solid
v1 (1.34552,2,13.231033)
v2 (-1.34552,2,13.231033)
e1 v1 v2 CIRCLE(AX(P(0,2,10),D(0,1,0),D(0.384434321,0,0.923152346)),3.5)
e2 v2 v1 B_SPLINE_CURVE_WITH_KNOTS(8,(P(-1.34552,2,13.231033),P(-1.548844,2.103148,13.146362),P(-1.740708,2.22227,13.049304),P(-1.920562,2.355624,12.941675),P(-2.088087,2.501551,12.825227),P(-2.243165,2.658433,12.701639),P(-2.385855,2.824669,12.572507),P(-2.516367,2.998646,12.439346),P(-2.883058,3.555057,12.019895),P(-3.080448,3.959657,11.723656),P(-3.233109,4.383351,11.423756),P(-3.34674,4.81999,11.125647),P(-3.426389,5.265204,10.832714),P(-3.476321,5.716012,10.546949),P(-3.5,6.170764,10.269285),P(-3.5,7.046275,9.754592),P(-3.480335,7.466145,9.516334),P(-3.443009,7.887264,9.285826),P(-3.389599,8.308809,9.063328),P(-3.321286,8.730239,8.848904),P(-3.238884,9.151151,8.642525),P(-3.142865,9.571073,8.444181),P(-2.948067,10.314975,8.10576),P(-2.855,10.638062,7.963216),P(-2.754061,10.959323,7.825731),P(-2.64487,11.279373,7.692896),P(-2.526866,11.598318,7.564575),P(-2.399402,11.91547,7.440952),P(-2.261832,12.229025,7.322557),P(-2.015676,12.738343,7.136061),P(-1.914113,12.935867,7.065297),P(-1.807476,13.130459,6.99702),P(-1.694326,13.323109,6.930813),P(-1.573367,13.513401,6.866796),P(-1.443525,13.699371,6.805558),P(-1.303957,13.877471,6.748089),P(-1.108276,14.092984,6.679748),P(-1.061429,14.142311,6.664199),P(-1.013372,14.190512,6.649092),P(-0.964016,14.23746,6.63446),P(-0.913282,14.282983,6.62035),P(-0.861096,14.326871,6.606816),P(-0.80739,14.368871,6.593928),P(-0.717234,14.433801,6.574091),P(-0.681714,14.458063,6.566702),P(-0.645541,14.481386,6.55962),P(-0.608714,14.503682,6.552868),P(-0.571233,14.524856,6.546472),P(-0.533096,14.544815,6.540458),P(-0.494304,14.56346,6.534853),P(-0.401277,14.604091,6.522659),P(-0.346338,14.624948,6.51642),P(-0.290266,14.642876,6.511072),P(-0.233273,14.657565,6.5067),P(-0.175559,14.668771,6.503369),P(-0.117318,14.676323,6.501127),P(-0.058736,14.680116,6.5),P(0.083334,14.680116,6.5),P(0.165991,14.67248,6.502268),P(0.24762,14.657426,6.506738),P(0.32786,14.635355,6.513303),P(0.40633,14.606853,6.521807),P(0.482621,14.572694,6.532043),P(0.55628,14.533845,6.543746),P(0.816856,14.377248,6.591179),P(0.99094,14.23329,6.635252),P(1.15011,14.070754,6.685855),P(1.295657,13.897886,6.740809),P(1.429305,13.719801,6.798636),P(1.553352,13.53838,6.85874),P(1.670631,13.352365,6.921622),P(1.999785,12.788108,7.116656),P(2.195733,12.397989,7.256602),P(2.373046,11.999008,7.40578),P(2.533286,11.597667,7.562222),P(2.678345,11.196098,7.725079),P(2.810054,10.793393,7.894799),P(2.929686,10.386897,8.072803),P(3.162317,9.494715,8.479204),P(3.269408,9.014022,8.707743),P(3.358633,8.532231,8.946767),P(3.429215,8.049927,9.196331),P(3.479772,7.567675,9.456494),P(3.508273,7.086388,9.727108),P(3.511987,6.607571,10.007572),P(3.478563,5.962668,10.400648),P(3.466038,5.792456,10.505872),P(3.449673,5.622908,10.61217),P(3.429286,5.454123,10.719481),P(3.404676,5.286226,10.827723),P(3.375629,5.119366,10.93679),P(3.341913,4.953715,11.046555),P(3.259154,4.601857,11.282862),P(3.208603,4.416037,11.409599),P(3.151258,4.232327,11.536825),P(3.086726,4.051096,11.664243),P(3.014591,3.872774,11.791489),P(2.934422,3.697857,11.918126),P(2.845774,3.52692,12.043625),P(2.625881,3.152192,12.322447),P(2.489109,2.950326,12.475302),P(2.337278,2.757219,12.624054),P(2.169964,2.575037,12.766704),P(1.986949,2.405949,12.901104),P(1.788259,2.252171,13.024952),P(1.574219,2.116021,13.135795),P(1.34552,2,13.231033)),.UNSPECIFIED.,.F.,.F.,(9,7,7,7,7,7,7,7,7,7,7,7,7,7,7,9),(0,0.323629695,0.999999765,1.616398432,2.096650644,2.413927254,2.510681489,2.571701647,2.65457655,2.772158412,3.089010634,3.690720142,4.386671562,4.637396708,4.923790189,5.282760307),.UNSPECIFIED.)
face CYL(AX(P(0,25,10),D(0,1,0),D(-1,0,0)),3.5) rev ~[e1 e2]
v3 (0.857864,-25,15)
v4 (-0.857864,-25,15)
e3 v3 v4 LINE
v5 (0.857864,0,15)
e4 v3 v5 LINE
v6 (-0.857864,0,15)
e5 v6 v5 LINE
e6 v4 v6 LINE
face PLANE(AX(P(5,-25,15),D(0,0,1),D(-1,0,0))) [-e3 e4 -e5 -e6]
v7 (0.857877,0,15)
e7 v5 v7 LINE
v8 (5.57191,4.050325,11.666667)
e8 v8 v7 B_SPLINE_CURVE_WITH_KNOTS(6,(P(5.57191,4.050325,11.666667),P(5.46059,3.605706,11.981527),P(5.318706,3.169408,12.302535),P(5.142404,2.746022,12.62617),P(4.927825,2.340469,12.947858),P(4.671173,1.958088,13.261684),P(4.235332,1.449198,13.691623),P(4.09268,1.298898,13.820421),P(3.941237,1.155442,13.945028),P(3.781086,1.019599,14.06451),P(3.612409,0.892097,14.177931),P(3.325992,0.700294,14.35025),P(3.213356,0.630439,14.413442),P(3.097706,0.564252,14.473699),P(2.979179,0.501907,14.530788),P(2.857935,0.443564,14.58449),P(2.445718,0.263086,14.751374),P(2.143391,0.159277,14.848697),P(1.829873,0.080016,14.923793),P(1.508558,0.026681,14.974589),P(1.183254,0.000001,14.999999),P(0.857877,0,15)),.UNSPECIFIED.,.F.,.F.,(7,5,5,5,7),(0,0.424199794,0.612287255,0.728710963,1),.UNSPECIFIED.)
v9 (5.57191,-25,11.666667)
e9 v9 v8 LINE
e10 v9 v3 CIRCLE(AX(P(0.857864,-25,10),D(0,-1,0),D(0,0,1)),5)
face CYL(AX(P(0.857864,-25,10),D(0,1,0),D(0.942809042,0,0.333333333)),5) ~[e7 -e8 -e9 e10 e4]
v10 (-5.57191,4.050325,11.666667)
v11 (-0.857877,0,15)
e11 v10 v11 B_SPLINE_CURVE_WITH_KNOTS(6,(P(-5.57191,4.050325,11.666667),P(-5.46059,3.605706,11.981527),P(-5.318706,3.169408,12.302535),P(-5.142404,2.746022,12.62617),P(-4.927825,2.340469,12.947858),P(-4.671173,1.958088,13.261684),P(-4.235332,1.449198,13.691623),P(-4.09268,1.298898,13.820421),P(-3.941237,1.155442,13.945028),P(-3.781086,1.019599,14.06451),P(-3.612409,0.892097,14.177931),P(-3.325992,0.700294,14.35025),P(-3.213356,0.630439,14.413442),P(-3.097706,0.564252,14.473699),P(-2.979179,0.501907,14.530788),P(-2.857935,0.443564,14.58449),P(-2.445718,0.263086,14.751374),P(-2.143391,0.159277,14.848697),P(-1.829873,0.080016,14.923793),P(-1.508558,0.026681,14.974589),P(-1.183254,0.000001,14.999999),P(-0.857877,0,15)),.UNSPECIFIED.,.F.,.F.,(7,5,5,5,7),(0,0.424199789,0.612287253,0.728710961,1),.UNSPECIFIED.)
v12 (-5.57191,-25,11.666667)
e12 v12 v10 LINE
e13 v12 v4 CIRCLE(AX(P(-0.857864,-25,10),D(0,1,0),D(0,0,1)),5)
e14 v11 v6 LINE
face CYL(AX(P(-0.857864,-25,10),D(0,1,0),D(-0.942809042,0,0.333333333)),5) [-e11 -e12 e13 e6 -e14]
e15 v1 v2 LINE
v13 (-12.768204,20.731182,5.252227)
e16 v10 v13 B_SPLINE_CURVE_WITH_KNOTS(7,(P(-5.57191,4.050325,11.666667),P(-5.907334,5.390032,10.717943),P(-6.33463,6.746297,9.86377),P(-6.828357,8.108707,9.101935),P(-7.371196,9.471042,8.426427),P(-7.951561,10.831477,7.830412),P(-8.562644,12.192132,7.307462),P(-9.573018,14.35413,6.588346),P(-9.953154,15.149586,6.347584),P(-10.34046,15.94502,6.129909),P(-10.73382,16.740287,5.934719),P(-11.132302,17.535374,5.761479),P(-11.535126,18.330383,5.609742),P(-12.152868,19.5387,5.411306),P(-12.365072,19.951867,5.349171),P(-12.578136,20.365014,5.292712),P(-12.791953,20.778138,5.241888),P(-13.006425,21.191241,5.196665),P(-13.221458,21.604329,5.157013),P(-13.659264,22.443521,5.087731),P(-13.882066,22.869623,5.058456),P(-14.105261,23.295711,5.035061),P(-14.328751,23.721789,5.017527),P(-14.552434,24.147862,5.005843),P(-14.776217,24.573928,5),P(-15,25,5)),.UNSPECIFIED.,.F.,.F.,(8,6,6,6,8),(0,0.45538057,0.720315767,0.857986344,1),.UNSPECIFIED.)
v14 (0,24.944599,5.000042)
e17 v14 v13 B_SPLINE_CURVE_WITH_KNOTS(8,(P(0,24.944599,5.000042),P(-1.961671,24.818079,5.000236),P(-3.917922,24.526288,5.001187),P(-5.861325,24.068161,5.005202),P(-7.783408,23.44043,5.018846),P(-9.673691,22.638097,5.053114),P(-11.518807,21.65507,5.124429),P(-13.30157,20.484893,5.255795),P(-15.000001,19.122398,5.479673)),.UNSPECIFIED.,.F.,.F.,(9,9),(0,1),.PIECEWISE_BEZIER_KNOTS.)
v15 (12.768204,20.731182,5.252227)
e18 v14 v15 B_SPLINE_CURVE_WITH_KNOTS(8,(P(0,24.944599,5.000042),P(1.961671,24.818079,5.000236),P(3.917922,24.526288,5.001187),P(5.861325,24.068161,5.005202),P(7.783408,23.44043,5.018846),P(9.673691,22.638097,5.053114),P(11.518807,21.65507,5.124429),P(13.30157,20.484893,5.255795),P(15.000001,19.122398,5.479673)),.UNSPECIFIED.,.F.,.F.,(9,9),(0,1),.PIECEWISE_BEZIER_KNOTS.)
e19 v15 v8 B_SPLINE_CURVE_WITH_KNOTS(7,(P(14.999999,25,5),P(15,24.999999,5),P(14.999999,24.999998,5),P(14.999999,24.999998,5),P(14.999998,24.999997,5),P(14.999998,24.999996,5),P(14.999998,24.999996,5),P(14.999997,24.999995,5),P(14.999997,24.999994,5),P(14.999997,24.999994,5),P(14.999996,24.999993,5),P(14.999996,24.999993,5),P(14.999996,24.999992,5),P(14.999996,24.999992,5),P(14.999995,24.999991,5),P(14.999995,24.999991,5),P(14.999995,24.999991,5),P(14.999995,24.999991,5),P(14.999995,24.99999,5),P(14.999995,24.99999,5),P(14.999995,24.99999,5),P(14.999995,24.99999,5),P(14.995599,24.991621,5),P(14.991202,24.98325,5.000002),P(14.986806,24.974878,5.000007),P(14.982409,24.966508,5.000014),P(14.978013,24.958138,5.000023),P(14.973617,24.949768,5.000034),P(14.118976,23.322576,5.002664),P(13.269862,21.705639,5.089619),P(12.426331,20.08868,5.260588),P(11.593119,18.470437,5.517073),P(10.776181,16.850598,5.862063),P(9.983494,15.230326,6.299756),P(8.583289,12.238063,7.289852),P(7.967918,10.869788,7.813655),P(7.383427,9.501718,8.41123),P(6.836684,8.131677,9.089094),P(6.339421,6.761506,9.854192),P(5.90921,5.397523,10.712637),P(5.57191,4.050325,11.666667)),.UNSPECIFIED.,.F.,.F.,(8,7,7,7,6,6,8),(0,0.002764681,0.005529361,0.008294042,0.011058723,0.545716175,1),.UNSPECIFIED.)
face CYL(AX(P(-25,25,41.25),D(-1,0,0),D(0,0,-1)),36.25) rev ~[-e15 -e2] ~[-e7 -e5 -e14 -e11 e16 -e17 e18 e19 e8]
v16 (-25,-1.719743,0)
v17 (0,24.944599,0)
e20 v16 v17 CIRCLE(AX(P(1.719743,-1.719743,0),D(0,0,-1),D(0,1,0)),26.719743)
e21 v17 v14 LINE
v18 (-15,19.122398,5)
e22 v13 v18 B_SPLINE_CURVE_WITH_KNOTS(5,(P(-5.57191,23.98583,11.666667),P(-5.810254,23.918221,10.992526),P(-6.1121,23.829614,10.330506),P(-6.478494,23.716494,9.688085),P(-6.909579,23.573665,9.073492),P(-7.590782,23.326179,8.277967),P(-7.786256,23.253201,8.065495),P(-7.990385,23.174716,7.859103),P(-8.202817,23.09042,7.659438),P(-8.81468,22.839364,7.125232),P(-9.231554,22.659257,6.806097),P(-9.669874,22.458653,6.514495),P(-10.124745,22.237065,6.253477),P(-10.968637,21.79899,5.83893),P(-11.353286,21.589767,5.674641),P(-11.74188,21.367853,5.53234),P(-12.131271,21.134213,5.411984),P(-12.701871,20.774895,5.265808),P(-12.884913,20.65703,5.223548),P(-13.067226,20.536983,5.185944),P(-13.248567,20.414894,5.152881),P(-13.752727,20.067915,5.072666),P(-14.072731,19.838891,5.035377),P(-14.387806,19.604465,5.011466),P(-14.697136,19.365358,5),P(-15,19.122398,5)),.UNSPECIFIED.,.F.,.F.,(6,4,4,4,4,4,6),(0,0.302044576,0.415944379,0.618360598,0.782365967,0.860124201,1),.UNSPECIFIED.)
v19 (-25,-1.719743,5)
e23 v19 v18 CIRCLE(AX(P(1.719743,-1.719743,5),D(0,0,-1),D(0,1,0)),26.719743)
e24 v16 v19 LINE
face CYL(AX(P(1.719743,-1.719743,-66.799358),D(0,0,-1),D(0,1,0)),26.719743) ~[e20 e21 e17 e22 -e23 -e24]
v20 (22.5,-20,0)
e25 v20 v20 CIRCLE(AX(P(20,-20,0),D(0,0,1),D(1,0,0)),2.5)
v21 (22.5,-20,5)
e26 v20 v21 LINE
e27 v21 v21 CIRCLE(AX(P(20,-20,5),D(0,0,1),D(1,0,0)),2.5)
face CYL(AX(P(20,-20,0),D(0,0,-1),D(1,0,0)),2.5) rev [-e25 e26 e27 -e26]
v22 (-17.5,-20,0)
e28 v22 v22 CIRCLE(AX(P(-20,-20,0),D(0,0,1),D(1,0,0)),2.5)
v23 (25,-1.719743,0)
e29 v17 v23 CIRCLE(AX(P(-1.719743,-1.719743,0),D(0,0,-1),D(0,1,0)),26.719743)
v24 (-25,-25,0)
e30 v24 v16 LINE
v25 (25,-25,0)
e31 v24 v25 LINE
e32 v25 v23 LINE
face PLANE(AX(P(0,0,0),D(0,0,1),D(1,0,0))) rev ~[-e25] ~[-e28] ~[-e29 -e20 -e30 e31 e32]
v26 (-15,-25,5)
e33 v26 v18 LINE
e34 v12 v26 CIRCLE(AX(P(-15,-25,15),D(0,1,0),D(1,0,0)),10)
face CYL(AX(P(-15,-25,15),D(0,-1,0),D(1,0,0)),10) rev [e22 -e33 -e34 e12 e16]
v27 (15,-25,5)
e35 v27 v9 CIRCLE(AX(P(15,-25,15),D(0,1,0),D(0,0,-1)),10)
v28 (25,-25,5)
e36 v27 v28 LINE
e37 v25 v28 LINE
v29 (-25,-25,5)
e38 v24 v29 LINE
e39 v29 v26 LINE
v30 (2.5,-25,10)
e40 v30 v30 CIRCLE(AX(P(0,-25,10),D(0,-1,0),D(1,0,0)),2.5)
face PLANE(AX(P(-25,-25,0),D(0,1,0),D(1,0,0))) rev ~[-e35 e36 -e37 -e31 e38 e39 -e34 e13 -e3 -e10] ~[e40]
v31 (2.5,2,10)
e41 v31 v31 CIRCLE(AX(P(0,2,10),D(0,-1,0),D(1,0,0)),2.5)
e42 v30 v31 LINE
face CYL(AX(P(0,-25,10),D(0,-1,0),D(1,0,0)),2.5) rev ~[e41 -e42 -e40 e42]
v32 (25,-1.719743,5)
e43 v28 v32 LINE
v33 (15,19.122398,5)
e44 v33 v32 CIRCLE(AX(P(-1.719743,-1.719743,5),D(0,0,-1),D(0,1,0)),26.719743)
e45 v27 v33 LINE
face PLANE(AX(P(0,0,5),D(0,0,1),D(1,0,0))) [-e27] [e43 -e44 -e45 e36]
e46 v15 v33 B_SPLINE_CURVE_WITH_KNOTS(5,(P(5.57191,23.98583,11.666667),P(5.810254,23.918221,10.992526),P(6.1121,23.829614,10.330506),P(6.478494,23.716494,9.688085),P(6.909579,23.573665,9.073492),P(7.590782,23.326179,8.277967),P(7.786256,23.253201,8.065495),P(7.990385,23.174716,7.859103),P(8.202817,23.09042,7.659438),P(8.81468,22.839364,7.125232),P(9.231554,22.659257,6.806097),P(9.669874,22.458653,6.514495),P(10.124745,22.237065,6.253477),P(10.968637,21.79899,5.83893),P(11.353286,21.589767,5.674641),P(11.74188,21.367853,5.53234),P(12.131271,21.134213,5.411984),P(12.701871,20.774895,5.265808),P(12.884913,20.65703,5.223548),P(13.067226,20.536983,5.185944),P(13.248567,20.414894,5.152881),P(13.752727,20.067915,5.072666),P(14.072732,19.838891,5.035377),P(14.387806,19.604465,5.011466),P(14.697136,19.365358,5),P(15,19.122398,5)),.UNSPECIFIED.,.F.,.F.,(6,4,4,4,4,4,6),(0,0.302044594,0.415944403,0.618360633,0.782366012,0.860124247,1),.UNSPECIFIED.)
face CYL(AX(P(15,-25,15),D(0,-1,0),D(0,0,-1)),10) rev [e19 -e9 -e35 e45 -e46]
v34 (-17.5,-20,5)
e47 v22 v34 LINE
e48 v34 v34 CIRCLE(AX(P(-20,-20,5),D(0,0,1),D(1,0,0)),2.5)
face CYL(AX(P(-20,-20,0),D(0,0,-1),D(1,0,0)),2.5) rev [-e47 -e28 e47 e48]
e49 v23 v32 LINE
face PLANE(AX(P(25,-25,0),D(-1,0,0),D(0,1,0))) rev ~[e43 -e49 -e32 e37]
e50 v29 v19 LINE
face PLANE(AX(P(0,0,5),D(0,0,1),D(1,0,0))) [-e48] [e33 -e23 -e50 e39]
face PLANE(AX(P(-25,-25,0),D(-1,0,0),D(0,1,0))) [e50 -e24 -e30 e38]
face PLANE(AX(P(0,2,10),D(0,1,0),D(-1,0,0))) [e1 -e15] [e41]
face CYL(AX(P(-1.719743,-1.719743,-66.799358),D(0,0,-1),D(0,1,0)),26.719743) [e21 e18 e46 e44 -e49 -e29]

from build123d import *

# Parameters (mm, degrees)
F0_W        = 50
F0_H        = 50
F0_R        = 2.5
F1_DEPTH    = 5
F2_R        = 2.5
F3_DEPTH    = 50
F4_R        = 5
F6_DEPTH    = 50
F7_R        = 3.5
F8_DEPTH    = 23
F9_T1_DEPTH = 138.5987158


# Not quite as in the source:
# - a fillet or chamfer that OpenCascade refuses, or shapes differently, is made with other operations: its cross-section is extruded or revolved along the edge and cut away or added


with BuildPart() as f1:
    # F0 (on Top) → F1 (new body)
    with BuildSketch(Plane.XY):
        Rectangle(F0_W, F0_H)
        with Locations((-20, -20)):
            Circle(F0_R, mode=Mode.SUBTRACT)
        with Locations((20, -20)):
            Circle(F0_R, mode=Mode.SUBTRACT)
    extrude(amount=F1_DEPTH)

    # F2 (on face) → F3 (join, through all)
    with BuildSketch(Plane.XZ.offset(25)):
        with BuildLine():
            Line((-5, 5), (5, 5))
            Line((5, 5), (15, 5))
            ThreePointArc((15, 5), (7.9289321881, 7.9289321881), (5, 15))
            Line((5, 15), (-5, 15))
            ThreePointArc((-5, 15), (-7.9289321881, 7.9289321881), (-15, 5))
            Line((-15, 5), (-5, 5))
        make_face()
        with Locations((0, 10)):
            Circle(F2_R, mode=Mode.SUBTRACT)
    extrude(amount=-F3_DEPTH)

    # F4
    f4_edges = [f1.edges().sort_by_distance(p)[0] for p in [
        (-5, 0, 15),
        (5, 0, 15),
    ]]
    fillet(f4_edges, radius=F4_R)

    # F5 (on face) → F6 (cut, through all)
    with BuildSketch(Plane(origin=(-25, 0, 0), x_dir=(0, -1, 0), z_dir=(-1, 0, 0))):
        with BuildLine():
            Line((-25, 15), (-25, 5))
            ThreePointArc((-25, 5), (-11.5370879822, 7.5927199554), (0, 15))
            Line((0, 15), (-25, 15))
        make_face()
    extrude(amount=-F6_DEPTH, mode=Mode.SUBTRACT)

    # F7 (on face) → F8 (cut)
    with BuildSketch(Plane(origin=(0, 25, 0), x_dir=(-1, 0, 0), z_dir=(0, 1, 0))):
        with Locations((0, 10)):
            Circle(F7_R)
    extrude(amount=-F8_DEPTH, mode=Mode.SUBTRACT)

    # F9: fillet of radius 26.71974316 on 2 edges, made by hand

    # F9_s2 → F9_t1 (cut)
    with BuildSketch(Plane.XY.offset(-66.7993579)):
        with BuildLine():
            ThreePointArc((-1.71974316, 25), (17.17396842, 17.17396842), (25, -1.71974316))
            Line((25, -1.71974316), (25, 25))
            Line((25, 25), (-1.71974316, 25))
        make_face()
        with BuildLine():
            ThreePointArc((1.71974316, 25), (-17.17396842, 17.17396842), (-25, -1.71974316))
            Line((-25, -1.71974316), (-25, 25))
            Line((-25, 25), (1.71974316, 25))
        make_face()
    extrude(amount=F9_T1_DEPTH, mode=Mode.SUBTRACT)


solid = f1.part
